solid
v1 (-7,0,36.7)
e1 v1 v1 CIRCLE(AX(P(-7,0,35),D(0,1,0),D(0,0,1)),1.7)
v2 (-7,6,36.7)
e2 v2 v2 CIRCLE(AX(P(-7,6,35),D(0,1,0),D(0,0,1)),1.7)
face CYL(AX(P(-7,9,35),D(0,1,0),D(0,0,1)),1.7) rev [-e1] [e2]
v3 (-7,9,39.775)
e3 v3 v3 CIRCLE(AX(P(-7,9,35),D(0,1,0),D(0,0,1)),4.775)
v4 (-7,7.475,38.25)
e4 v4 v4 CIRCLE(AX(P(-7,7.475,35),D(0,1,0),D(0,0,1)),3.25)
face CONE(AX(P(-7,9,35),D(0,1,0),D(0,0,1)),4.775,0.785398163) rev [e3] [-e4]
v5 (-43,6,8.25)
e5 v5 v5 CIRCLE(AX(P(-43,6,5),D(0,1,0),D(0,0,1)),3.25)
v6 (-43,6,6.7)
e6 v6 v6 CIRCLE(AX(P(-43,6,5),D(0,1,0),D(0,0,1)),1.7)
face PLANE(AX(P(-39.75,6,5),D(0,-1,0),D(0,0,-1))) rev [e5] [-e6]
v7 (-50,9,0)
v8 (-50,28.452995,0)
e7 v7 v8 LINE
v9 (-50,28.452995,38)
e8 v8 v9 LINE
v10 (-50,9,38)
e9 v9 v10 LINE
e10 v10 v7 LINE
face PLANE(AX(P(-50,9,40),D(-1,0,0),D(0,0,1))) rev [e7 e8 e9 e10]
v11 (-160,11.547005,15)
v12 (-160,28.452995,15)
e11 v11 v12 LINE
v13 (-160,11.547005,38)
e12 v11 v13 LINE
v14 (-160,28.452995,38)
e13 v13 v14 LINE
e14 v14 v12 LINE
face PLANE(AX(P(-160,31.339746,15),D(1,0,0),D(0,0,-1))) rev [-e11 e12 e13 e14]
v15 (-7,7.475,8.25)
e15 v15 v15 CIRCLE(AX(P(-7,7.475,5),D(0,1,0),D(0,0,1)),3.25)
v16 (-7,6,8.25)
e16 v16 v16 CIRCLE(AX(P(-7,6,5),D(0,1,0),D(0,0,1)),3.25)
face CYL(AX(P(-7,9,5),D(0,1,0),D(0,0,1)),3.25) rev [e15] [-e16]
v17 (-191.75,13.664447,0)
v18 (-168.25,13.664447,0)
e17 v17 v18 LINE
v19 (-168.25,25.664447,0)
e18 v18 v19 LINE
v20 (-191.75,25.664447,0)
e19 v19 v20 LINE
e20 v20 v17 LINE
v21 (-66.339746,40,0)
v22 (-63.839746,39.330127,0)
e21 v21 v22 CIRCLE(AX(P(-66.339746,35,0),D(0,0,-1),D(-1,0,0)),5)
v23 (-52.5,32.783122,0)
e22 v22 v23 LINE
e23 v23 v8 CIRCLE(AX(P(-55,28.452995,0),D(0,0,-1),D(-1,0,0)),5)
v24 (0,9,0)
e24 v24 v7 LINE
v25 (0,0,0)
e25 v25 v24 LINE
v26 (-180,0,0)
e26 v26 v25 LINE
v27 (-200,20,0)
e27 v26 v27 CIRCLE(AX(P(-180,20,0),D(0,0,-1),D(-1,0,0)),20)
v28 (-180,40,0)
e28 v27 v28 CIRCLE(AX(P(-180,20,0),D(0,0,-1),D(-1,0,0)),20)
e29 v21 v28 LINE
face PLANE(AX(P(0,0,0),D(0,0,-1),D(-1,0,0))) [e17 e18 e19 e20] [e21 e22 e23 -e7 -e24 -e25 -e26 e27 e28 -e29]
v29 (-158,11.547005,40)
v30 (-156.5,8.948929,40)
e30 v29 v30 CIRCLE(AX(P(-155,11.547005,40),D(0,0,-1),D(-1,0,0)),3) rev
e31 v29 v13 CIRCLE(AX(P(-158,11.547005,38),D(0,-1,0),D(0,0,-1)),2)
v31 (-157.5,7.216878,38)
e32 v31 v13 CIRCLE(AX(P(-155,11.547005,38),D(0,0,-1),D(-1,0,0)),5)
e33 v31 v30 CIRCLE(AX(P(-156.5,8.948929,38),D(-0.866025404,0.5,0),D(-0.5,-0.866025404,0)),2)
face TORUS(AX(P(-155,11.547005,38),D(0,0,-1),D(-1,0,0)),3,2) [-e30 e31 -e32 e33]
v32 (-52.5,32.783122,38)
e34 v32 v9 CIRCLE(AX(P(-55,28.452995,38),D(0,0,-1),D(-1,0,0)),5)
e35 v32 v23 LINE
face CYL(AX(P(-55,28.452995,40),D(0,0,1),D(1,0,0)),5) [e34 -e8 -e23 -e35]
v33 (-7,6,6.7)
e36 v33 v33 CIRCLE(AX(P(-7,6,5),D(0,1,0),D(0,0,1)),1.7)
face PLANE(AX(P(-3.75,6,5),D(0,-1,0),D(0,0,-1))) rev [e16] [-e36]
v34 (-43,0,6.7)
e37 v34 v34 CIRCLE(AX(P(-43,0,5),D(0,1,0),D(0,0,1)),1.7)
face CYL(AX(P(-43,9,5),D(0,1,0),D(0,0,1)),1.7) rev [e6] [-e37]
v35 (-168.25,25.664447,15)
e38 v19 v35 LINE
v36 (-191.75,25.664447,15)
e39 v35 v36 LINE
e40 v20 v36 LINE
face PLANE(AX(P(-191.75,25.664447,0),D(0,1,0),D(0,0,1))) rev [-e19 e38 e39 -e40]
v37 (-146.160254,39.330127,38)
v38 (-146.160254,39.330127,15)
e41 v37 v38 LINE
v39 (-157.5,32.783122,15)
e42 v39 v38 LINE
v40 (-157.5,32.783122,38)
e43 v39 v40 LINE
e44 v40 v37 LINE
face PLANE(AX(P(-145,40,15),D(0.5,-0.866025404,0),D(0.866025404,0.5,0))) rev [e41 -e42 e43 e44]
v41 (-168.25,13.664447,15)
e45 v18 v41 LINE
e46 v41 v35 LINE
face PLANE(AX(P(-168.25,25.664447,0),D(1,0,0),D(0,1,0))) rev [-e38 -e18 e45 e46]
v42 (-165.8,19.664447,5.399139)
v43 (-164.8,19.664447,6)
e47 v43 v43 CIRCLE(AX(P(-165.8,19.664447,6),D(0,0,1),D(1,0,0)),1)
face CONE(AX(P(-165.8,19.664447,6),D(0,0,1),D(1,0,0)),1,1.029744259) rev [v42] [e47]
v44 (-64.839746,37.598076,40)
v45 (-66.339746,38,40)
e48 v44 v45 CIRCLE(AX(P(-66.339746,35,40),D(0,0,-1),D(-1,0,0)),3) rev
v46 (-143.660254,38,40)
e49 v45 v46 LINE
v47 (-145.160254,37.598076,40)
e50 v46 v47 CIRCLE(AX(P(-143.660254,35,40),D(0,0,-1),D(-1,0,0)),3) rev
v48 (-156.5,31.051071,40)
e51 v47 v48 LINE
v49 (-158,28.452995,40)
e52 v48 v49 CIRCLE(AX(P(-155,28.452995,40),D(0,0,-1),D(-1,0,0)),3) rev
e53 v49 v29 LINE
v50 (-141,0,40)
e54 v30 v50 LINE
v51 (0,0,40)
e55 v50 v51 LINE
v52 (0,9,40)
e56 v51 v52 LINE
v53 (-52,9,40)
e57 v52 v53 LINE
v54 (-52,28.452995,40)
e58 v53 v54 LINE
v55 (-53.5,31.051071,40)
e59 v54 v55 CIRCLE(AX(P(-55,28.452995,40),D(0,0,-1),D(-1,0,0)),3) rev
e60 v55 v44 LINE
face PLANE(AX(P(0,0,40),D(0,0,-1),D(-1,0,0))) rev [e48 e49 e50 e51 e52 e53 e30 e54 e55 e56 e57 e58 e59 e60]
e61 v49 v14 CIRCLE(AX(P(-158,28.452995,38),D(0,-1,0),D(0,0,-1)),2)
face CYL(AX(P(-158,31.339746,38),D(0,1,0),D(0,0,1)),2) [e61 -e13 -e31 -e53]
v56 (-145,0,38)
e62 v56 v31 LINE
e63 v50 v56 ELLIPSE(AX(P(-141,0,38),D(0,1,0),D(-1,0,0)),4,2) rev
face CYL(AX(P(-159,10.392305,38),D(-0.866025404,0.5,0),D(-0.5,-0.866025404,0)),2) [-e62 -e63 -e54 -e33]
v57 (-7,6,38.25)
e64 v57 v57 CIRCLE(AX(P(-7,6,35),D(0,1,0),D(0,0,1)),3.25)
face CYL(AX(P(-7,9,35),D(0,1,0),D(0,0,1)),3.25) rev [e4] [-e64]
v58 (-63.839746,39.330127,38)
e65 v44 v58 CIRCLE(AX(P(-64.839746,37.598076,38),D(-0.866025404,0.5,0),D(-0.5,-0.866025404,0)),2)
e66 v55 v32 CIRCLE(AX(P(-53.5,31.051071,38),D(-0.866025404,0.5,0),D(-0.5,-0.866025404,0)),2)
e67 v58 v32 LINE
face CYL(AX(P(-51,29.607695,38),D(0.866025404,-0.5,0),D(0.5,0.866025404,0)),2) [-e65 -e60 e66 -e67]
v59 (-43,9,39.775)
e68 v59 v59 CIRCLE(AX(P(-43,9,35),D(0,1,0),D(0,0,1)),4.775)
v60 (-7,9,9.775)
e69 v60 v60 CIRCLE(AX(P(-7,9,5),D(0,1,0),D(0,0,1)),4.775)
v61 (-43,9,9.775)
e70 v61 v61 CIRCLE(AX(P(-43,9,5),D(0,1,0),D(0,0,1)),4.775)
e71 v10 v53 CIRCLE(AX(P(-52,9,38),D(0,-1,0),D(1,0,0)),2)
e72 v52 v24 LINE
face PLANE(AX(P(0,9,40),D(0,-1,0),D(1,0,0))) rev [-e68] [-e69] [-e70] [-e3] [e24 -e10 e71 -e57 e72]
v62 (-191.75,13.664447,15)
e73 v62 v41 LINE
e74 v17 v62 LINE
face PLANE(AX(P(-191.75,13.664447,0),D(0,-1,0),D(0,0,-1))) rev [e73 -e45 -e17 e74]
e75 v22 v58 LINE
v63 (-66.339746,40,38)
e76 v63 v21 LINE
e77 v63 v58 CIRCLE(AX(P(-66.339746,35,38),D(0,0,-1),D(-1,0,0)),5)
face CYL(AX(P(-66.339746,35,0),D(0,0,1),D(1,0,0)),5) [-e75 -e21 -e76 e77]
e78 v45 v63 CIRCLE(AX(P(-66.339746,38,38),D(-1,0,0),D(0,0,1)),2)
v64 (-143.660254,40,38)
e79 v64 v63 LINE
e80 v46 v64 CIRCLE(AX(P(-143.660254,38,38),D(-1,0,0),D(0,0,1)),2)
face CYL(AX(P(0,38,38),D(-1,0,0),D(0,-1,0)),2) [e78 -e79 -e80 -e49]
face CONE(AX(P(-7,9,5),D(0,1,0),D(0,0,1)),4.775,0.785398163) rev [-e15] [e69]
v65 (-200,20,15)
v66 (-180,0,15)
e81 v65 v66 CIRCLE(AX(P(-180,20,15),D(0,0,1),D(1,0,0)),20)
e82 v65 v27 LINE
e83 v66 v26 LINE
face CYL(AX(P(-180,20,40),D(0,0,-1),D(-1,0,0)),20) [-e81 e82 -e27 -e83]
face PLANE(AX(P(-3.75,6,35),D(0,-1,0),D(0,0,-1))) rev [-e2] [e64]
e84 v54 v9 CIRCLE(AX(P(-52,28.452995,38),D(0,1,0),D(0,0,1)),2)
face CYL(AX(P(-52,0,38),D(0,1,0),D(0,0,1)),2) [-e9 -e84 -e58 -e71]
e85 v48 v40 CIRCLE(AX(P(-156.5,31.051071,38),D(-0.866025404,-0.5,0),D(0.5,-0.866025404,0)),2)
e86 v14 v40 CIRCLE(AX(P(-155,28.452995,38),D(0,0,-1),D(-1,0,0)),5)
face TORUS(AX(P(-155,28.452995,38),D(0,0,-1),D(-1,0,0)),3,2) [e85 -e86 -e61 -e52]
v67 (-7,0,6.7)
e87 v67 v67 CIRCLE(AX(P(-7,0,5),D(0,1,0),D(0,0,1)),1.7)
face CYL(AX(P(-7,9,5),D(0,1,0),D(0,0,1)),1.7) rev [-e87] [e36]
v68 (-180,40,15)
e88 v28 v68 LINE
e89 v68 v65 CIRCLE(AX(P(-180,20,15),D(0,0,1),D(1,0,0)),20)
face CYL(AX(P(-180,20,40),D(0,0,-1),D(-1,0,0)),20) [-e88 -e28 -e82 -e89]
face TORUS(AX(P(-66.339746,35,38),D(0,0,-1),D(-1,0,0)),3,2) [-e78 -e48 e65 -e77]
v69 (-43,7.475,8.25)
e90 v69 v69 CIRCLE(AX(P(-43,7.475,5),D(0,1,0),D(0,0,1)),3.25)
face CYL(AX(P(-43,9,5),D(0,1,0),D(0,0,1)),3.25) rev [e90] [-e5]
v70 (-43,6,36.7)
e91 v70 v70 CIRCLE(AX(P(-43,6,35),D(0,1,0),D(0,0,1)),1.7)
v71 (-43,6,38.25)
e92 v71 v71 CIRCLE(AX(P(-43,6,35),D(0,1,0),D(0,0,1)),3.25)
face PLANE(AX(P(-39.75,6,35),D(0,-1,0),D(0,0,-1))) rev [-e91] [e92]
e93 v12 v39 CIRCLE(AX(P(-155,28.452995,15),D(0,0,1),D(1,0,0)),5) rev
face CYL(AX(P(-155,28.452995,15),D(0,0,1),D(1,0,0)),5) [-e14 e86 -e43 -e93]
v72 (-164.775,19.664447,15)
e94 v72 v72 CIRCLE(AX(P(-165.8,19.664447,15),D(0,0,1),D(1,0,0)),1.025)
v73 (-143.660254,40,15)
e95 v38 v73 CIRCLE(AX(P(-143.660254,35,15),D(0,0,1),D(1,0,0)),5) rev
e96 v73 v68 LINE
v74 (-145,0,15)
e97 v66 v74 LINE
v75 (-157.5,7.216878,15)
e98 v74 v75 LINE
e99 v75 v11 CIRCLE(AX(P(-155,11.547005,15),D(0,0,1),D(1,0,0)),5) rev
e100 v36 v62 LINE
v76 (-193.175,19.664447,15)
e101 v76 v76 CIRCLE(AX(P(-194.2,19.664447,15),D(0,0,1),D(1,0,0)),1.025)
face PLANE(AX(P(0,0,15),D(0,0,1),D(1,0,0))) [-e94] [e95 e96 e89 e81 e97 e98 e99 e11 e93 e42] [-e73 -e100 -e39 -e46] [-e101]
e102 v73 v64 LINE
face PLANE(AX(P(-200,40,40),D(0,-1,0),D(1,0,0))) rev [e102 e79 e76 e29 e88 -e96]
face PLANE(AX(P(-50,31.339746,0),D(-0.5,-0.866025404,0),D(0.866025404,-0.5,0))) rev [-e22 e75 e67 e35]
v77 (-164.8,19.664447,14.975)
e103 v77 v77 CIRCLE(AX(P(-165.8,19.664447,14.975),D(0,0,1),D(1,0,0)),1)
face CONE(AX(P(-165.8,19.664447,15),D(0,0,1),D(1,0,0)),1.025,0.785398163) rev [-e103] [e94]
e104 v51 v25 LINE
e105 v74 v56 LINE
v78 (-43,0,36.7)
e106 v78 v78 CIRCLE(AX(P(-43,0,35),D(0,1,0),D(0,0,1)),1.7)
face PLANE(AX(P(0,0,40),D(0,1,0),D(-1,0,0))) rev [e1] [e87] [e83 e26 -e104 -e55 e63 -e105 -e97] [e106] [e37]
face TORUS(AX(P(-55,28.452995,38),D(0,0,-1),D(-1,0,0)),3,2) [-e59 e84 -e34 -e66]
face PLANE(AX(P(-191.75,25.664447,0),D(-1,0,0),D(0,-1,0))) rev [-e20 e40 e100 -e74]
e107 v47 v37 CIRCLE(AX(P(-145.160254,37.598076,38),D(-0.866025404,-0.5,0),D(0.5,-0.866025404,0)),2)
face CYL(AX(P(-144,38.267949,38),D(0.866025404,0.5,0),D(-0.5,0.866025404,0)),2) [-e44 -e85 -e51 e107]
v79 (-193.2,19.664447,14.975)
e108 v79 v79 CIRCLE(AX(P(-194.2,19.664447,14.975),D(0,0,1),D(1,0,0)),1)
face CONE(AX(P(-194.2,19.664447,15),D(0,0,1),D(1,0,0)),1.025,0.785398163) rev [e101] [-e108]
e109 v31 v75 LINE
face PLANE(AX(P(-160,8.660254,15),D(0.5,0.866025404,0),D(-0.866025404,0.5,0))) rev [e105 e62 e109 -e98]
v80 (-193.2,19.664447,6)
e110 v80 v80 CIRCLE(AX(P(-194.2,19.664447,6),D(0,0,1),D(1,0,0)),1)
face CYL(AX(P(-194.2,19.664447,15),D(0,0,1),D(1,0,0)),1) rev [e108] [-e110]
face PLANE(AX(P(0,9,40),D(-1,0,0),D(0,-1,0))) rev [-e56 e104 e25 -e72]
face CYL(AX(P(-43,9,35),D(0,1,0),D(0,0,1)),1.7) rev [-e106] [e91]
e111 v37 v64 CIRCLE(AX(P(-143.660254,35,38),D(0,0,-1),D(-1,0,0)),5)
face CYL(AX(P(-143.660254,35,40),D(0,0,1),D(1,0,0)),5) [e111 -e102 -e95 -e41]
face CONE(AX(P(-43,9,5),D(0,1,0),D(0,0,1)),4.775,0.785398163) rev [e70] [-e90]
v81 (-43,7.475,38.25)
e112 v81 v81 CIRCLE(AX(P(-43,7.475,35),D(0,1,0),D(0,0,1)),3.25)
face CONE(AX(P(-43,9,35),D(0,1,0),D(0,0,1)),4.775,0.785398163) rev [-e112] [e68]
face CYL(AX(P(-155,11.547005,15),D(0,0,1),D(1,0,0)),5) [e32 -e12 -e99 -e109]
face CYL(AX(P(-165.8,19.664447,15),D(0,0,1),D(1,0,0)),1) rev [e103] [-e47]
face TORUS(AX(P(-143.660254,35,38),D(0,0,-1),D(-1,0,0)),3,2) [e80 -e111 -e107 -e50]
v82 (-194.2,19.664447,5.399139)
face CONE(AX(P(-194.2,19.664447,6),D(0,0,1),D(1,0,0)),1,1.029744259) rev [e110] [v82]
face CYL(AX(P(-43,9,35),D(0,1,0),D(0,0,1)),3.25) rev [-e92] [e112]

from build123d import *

# Parameters (mm, degrees)
BOSS_EXTRUDE1_DEPTH                        = 40
CUT_EXTRUDE2_DEPTH                         = 25
CUT_EXTRUDE4_DEPTH                         = 208.846096908
F_2_0MM_DOWEL_HOLE1_D                      = 2
F_2_0MM_DOWEL_HOLE1_DEPTH                  = 9
F_2_0MM_DOWEL_HOLE1_CSINK_D                = 2.05
F_2_0MM_DOWEL_HOLE1_CSINK_ANGLE            = 90
F_2_0MM_DOWEL_HOLE1_TIP                    = 0.600860619
SKETCH11_W                                 = 23.5
SKETCH11_H                                 = 12
CUT_EXTRUDE3_DEPTH                         = 206.48722588
FILLET7_R                                  = 5
FILLET6_R                                  = 2
CBORE_FOR_M5_CHEESE_HEAD_SCREW1_AT_2_COUNT = 2
CBORE_FOR_M5_CHEESE_HEAD_SCREW1_AT_2_PITCH = 36
CBORE_FOR_M5_CHEESE_HEAD_SCREW1_AT_3_COUNT = 2
CBORE_FOR_M5_CHEESE_HEAD_SCREW1_AT_3_PITCH = 30
CBORE_FOR_M5_CHEESE_HEAD_SCREW1_AT_4_COUNT = 2
CBORE_FOR_M5_CHEESE_HEAD_SCREW1_AT_4_PITCH = 46.861498055
FILLET8_R                                  = 20


with BuildPart() as part:
    # Sketch1 → Boss-Extrude1 (new body)
    with BuildSketch(Plane.XY):
        Polygon((0, 0), (-200, 0), (-200, 40), (-50, 40), (-50, 9), (0, 9), align=None)
    extrude(amount=BOSS_EXTRUDE1_DEPTH)

    # Sketch5 → Cut-Extrude2 (cut)
    with BuildSketch(Plane.XY.offset(40)):
        Polygon((-145, 40), (-160, 31.339745962), (-160, 8.660254038), (-145, 0), (-200, 0), (-200, 40), align=None)
    extrude(amount=-CUT_EXTRUDE2_DEPTH, mode=Mode.SUBTRACT)

    # Sketch13 → Cut-Extrude4 (cut, through all)
    with BuildSketch(Plane.XY.offset(40)):
        Polygon((-50, 31.339745962), (-65, 40), (-50, 40), align=None)
    extrude(amount=-CUT_EXTRUDE4_DEPTH, mode=Mode.SUBTRACT)

    # Ø2.0mm Dowel Hole1
    with Locations(Plane.XY.offset(15)):
        with Locations((-194.2, 19.664446974), (-165.8, 19.664446974)):
            CounterSinkHole(F_2_0MM_DOWEL_HOLE1_D / 2, F_2_0MM_DOWEL_HOLE1_CSINK_D / 2, depth=F_2_0MM_DOWEL_HOLE1_DEPTH, counter_sink_angle=F_2_0MM_DOWEL_HOLE1_CSINK_ANGLE)
            with Locations((0, 0, -(F_2_0MM_DOWEL_HOLE1_DEPTH + F_2_0MM_DOWEL_HOLE1_TIP / 2))):  # 118° drill point
                Cone(0, F_2_0MM_DOWEL_HOLE1_D / 2, F_2_0MM_DOWEL_HOLE1_TIP, mode=Mode.SUBTRACT)

    # Sketch11 → Cut-Extrude3 (cut, through all)
    with BuildSketch(Plane.XY.offset(15)):
        with Locations((-180, 19.664446974)):
            Rectangle(SKETCH11_W, SKETCH11_H)
    extrude(amount=-CUT_EXTRUDE3_DEPTH, mode=Mode.SUBTRACT)

    # Fillet7
    fillet7_edges = [part.edges().sort_by_distance(p)[0] for p in [
        (-145, 40, 27.5),
        (-160, 31.339745962, 27.5),
        (-160, 8.660254038, 27.5),
        (-50, 31.339745962, 20),
        (-65, 40, 20),
    ]]
    fillet(fillet7_edges, radius=FILLET7_R)

    # Fillet6
    fillet6_edges = [part.edges().sort_by_distance(p)[0] for p in [
        (-50, 18.726497308, 40),
        (-151.25, 3.608439182, 40),
        (-58.169872981, 36.056624327, 40),
        (-105, 40, 40),
        (-151.830127019, 36.056624327, 40),
        (-160, 20, 40),
        (-159.330127019, 30.952994616, 40),
        (-159.330127019, 9.047005384, 40),
        (-144.954349263, 39.829629131, 40),
        (-50.669872981, 30.952994616, 40),
        (-65.045650737, 39.829629131, 40),
    ]]
    fillet(fillet6_edges, radius=FILLET6_R)

    # Sketch3 → CBORE for M5 Cheese Head Screw1 (revolve, cut)
    with BuildSketch(Plane(origin=(-43, 9, 5), x_dir=(0, 0, 1), z_dir=(1, 0, 0))):
        Polygon((0, 0), (0, 9), (1.7, 9), (1.7, 3), (3.25, 3), (3.25, 1.525), (4.775, 0), align=None)
    cbore_for_m5_cheese_head_screw1 = revolve(axis=Axis((-43, 15.35, 5), (0, -1, 0)), mode=Mode.SUBTRACT)

    # CBORE for M5 Cheese Head Screw1 at 2: CBORE for M5 Cheese Head Screw1 ×2
    with Locations(*[(i * CBORE_FOR_M5_CHEESE_HEAD_SCREW1_AT_2_PITCH, 0, 0) for i in range(1, CBORE_FOR_M5_CHEESE_HEAD_SCREW1_AT_2_COUNT)]):
        add(cbore_for_m5_cheese_head_screw1, mode=Mode.SUBTRACT)

    # CBORE for M5 Cheese Head Screw1 at 3: CBORE for M5 Cheese Head Screw1 ×2
    with Locations(*[(0, 0, i * CBORE_FOR_M5_CHEESE_HEAD_SCREW1_AT_3_PITCH) for i in range(1, CBORE_FOR_M5_CHEESE_HEAD_SCREW1_AT_3_COUNT)]):
        add(cbore_for_m5_cheese_head_screw1, mode=Mode.SUBTRACT)

    # CBORE for M5 Cheese Head Screw1 at 4: CBORE for M5 Cheese Head Screw1 ×2
    with Locations(*[Vector(0.7682212795973759, 0, 0.6401843996644799) * (i * CBORE_FOR_M5_CHEESE_HEAD_SCREW1_AT_4_PITCH) for i in range(1, CBORE_FOR_M5_CHEESE_HEAD_SCREW1_AT_4_COUNT)]):
        add(cbore_for_m5_cheese_head_screw1, mode=Mode.SUBTRACT)

    # Fillet8
    fillet8_edges = [part.edges().sort_by_distance(p)[0] for p in [
        (-200, 0, 7.5),
        (-200, 40, 7.5),
    ]]
    fillet(fillet8_edges, radius=FILLET8_R - 0.0001)  # a hair under: the kernel refuses the full size


solid = part.part
